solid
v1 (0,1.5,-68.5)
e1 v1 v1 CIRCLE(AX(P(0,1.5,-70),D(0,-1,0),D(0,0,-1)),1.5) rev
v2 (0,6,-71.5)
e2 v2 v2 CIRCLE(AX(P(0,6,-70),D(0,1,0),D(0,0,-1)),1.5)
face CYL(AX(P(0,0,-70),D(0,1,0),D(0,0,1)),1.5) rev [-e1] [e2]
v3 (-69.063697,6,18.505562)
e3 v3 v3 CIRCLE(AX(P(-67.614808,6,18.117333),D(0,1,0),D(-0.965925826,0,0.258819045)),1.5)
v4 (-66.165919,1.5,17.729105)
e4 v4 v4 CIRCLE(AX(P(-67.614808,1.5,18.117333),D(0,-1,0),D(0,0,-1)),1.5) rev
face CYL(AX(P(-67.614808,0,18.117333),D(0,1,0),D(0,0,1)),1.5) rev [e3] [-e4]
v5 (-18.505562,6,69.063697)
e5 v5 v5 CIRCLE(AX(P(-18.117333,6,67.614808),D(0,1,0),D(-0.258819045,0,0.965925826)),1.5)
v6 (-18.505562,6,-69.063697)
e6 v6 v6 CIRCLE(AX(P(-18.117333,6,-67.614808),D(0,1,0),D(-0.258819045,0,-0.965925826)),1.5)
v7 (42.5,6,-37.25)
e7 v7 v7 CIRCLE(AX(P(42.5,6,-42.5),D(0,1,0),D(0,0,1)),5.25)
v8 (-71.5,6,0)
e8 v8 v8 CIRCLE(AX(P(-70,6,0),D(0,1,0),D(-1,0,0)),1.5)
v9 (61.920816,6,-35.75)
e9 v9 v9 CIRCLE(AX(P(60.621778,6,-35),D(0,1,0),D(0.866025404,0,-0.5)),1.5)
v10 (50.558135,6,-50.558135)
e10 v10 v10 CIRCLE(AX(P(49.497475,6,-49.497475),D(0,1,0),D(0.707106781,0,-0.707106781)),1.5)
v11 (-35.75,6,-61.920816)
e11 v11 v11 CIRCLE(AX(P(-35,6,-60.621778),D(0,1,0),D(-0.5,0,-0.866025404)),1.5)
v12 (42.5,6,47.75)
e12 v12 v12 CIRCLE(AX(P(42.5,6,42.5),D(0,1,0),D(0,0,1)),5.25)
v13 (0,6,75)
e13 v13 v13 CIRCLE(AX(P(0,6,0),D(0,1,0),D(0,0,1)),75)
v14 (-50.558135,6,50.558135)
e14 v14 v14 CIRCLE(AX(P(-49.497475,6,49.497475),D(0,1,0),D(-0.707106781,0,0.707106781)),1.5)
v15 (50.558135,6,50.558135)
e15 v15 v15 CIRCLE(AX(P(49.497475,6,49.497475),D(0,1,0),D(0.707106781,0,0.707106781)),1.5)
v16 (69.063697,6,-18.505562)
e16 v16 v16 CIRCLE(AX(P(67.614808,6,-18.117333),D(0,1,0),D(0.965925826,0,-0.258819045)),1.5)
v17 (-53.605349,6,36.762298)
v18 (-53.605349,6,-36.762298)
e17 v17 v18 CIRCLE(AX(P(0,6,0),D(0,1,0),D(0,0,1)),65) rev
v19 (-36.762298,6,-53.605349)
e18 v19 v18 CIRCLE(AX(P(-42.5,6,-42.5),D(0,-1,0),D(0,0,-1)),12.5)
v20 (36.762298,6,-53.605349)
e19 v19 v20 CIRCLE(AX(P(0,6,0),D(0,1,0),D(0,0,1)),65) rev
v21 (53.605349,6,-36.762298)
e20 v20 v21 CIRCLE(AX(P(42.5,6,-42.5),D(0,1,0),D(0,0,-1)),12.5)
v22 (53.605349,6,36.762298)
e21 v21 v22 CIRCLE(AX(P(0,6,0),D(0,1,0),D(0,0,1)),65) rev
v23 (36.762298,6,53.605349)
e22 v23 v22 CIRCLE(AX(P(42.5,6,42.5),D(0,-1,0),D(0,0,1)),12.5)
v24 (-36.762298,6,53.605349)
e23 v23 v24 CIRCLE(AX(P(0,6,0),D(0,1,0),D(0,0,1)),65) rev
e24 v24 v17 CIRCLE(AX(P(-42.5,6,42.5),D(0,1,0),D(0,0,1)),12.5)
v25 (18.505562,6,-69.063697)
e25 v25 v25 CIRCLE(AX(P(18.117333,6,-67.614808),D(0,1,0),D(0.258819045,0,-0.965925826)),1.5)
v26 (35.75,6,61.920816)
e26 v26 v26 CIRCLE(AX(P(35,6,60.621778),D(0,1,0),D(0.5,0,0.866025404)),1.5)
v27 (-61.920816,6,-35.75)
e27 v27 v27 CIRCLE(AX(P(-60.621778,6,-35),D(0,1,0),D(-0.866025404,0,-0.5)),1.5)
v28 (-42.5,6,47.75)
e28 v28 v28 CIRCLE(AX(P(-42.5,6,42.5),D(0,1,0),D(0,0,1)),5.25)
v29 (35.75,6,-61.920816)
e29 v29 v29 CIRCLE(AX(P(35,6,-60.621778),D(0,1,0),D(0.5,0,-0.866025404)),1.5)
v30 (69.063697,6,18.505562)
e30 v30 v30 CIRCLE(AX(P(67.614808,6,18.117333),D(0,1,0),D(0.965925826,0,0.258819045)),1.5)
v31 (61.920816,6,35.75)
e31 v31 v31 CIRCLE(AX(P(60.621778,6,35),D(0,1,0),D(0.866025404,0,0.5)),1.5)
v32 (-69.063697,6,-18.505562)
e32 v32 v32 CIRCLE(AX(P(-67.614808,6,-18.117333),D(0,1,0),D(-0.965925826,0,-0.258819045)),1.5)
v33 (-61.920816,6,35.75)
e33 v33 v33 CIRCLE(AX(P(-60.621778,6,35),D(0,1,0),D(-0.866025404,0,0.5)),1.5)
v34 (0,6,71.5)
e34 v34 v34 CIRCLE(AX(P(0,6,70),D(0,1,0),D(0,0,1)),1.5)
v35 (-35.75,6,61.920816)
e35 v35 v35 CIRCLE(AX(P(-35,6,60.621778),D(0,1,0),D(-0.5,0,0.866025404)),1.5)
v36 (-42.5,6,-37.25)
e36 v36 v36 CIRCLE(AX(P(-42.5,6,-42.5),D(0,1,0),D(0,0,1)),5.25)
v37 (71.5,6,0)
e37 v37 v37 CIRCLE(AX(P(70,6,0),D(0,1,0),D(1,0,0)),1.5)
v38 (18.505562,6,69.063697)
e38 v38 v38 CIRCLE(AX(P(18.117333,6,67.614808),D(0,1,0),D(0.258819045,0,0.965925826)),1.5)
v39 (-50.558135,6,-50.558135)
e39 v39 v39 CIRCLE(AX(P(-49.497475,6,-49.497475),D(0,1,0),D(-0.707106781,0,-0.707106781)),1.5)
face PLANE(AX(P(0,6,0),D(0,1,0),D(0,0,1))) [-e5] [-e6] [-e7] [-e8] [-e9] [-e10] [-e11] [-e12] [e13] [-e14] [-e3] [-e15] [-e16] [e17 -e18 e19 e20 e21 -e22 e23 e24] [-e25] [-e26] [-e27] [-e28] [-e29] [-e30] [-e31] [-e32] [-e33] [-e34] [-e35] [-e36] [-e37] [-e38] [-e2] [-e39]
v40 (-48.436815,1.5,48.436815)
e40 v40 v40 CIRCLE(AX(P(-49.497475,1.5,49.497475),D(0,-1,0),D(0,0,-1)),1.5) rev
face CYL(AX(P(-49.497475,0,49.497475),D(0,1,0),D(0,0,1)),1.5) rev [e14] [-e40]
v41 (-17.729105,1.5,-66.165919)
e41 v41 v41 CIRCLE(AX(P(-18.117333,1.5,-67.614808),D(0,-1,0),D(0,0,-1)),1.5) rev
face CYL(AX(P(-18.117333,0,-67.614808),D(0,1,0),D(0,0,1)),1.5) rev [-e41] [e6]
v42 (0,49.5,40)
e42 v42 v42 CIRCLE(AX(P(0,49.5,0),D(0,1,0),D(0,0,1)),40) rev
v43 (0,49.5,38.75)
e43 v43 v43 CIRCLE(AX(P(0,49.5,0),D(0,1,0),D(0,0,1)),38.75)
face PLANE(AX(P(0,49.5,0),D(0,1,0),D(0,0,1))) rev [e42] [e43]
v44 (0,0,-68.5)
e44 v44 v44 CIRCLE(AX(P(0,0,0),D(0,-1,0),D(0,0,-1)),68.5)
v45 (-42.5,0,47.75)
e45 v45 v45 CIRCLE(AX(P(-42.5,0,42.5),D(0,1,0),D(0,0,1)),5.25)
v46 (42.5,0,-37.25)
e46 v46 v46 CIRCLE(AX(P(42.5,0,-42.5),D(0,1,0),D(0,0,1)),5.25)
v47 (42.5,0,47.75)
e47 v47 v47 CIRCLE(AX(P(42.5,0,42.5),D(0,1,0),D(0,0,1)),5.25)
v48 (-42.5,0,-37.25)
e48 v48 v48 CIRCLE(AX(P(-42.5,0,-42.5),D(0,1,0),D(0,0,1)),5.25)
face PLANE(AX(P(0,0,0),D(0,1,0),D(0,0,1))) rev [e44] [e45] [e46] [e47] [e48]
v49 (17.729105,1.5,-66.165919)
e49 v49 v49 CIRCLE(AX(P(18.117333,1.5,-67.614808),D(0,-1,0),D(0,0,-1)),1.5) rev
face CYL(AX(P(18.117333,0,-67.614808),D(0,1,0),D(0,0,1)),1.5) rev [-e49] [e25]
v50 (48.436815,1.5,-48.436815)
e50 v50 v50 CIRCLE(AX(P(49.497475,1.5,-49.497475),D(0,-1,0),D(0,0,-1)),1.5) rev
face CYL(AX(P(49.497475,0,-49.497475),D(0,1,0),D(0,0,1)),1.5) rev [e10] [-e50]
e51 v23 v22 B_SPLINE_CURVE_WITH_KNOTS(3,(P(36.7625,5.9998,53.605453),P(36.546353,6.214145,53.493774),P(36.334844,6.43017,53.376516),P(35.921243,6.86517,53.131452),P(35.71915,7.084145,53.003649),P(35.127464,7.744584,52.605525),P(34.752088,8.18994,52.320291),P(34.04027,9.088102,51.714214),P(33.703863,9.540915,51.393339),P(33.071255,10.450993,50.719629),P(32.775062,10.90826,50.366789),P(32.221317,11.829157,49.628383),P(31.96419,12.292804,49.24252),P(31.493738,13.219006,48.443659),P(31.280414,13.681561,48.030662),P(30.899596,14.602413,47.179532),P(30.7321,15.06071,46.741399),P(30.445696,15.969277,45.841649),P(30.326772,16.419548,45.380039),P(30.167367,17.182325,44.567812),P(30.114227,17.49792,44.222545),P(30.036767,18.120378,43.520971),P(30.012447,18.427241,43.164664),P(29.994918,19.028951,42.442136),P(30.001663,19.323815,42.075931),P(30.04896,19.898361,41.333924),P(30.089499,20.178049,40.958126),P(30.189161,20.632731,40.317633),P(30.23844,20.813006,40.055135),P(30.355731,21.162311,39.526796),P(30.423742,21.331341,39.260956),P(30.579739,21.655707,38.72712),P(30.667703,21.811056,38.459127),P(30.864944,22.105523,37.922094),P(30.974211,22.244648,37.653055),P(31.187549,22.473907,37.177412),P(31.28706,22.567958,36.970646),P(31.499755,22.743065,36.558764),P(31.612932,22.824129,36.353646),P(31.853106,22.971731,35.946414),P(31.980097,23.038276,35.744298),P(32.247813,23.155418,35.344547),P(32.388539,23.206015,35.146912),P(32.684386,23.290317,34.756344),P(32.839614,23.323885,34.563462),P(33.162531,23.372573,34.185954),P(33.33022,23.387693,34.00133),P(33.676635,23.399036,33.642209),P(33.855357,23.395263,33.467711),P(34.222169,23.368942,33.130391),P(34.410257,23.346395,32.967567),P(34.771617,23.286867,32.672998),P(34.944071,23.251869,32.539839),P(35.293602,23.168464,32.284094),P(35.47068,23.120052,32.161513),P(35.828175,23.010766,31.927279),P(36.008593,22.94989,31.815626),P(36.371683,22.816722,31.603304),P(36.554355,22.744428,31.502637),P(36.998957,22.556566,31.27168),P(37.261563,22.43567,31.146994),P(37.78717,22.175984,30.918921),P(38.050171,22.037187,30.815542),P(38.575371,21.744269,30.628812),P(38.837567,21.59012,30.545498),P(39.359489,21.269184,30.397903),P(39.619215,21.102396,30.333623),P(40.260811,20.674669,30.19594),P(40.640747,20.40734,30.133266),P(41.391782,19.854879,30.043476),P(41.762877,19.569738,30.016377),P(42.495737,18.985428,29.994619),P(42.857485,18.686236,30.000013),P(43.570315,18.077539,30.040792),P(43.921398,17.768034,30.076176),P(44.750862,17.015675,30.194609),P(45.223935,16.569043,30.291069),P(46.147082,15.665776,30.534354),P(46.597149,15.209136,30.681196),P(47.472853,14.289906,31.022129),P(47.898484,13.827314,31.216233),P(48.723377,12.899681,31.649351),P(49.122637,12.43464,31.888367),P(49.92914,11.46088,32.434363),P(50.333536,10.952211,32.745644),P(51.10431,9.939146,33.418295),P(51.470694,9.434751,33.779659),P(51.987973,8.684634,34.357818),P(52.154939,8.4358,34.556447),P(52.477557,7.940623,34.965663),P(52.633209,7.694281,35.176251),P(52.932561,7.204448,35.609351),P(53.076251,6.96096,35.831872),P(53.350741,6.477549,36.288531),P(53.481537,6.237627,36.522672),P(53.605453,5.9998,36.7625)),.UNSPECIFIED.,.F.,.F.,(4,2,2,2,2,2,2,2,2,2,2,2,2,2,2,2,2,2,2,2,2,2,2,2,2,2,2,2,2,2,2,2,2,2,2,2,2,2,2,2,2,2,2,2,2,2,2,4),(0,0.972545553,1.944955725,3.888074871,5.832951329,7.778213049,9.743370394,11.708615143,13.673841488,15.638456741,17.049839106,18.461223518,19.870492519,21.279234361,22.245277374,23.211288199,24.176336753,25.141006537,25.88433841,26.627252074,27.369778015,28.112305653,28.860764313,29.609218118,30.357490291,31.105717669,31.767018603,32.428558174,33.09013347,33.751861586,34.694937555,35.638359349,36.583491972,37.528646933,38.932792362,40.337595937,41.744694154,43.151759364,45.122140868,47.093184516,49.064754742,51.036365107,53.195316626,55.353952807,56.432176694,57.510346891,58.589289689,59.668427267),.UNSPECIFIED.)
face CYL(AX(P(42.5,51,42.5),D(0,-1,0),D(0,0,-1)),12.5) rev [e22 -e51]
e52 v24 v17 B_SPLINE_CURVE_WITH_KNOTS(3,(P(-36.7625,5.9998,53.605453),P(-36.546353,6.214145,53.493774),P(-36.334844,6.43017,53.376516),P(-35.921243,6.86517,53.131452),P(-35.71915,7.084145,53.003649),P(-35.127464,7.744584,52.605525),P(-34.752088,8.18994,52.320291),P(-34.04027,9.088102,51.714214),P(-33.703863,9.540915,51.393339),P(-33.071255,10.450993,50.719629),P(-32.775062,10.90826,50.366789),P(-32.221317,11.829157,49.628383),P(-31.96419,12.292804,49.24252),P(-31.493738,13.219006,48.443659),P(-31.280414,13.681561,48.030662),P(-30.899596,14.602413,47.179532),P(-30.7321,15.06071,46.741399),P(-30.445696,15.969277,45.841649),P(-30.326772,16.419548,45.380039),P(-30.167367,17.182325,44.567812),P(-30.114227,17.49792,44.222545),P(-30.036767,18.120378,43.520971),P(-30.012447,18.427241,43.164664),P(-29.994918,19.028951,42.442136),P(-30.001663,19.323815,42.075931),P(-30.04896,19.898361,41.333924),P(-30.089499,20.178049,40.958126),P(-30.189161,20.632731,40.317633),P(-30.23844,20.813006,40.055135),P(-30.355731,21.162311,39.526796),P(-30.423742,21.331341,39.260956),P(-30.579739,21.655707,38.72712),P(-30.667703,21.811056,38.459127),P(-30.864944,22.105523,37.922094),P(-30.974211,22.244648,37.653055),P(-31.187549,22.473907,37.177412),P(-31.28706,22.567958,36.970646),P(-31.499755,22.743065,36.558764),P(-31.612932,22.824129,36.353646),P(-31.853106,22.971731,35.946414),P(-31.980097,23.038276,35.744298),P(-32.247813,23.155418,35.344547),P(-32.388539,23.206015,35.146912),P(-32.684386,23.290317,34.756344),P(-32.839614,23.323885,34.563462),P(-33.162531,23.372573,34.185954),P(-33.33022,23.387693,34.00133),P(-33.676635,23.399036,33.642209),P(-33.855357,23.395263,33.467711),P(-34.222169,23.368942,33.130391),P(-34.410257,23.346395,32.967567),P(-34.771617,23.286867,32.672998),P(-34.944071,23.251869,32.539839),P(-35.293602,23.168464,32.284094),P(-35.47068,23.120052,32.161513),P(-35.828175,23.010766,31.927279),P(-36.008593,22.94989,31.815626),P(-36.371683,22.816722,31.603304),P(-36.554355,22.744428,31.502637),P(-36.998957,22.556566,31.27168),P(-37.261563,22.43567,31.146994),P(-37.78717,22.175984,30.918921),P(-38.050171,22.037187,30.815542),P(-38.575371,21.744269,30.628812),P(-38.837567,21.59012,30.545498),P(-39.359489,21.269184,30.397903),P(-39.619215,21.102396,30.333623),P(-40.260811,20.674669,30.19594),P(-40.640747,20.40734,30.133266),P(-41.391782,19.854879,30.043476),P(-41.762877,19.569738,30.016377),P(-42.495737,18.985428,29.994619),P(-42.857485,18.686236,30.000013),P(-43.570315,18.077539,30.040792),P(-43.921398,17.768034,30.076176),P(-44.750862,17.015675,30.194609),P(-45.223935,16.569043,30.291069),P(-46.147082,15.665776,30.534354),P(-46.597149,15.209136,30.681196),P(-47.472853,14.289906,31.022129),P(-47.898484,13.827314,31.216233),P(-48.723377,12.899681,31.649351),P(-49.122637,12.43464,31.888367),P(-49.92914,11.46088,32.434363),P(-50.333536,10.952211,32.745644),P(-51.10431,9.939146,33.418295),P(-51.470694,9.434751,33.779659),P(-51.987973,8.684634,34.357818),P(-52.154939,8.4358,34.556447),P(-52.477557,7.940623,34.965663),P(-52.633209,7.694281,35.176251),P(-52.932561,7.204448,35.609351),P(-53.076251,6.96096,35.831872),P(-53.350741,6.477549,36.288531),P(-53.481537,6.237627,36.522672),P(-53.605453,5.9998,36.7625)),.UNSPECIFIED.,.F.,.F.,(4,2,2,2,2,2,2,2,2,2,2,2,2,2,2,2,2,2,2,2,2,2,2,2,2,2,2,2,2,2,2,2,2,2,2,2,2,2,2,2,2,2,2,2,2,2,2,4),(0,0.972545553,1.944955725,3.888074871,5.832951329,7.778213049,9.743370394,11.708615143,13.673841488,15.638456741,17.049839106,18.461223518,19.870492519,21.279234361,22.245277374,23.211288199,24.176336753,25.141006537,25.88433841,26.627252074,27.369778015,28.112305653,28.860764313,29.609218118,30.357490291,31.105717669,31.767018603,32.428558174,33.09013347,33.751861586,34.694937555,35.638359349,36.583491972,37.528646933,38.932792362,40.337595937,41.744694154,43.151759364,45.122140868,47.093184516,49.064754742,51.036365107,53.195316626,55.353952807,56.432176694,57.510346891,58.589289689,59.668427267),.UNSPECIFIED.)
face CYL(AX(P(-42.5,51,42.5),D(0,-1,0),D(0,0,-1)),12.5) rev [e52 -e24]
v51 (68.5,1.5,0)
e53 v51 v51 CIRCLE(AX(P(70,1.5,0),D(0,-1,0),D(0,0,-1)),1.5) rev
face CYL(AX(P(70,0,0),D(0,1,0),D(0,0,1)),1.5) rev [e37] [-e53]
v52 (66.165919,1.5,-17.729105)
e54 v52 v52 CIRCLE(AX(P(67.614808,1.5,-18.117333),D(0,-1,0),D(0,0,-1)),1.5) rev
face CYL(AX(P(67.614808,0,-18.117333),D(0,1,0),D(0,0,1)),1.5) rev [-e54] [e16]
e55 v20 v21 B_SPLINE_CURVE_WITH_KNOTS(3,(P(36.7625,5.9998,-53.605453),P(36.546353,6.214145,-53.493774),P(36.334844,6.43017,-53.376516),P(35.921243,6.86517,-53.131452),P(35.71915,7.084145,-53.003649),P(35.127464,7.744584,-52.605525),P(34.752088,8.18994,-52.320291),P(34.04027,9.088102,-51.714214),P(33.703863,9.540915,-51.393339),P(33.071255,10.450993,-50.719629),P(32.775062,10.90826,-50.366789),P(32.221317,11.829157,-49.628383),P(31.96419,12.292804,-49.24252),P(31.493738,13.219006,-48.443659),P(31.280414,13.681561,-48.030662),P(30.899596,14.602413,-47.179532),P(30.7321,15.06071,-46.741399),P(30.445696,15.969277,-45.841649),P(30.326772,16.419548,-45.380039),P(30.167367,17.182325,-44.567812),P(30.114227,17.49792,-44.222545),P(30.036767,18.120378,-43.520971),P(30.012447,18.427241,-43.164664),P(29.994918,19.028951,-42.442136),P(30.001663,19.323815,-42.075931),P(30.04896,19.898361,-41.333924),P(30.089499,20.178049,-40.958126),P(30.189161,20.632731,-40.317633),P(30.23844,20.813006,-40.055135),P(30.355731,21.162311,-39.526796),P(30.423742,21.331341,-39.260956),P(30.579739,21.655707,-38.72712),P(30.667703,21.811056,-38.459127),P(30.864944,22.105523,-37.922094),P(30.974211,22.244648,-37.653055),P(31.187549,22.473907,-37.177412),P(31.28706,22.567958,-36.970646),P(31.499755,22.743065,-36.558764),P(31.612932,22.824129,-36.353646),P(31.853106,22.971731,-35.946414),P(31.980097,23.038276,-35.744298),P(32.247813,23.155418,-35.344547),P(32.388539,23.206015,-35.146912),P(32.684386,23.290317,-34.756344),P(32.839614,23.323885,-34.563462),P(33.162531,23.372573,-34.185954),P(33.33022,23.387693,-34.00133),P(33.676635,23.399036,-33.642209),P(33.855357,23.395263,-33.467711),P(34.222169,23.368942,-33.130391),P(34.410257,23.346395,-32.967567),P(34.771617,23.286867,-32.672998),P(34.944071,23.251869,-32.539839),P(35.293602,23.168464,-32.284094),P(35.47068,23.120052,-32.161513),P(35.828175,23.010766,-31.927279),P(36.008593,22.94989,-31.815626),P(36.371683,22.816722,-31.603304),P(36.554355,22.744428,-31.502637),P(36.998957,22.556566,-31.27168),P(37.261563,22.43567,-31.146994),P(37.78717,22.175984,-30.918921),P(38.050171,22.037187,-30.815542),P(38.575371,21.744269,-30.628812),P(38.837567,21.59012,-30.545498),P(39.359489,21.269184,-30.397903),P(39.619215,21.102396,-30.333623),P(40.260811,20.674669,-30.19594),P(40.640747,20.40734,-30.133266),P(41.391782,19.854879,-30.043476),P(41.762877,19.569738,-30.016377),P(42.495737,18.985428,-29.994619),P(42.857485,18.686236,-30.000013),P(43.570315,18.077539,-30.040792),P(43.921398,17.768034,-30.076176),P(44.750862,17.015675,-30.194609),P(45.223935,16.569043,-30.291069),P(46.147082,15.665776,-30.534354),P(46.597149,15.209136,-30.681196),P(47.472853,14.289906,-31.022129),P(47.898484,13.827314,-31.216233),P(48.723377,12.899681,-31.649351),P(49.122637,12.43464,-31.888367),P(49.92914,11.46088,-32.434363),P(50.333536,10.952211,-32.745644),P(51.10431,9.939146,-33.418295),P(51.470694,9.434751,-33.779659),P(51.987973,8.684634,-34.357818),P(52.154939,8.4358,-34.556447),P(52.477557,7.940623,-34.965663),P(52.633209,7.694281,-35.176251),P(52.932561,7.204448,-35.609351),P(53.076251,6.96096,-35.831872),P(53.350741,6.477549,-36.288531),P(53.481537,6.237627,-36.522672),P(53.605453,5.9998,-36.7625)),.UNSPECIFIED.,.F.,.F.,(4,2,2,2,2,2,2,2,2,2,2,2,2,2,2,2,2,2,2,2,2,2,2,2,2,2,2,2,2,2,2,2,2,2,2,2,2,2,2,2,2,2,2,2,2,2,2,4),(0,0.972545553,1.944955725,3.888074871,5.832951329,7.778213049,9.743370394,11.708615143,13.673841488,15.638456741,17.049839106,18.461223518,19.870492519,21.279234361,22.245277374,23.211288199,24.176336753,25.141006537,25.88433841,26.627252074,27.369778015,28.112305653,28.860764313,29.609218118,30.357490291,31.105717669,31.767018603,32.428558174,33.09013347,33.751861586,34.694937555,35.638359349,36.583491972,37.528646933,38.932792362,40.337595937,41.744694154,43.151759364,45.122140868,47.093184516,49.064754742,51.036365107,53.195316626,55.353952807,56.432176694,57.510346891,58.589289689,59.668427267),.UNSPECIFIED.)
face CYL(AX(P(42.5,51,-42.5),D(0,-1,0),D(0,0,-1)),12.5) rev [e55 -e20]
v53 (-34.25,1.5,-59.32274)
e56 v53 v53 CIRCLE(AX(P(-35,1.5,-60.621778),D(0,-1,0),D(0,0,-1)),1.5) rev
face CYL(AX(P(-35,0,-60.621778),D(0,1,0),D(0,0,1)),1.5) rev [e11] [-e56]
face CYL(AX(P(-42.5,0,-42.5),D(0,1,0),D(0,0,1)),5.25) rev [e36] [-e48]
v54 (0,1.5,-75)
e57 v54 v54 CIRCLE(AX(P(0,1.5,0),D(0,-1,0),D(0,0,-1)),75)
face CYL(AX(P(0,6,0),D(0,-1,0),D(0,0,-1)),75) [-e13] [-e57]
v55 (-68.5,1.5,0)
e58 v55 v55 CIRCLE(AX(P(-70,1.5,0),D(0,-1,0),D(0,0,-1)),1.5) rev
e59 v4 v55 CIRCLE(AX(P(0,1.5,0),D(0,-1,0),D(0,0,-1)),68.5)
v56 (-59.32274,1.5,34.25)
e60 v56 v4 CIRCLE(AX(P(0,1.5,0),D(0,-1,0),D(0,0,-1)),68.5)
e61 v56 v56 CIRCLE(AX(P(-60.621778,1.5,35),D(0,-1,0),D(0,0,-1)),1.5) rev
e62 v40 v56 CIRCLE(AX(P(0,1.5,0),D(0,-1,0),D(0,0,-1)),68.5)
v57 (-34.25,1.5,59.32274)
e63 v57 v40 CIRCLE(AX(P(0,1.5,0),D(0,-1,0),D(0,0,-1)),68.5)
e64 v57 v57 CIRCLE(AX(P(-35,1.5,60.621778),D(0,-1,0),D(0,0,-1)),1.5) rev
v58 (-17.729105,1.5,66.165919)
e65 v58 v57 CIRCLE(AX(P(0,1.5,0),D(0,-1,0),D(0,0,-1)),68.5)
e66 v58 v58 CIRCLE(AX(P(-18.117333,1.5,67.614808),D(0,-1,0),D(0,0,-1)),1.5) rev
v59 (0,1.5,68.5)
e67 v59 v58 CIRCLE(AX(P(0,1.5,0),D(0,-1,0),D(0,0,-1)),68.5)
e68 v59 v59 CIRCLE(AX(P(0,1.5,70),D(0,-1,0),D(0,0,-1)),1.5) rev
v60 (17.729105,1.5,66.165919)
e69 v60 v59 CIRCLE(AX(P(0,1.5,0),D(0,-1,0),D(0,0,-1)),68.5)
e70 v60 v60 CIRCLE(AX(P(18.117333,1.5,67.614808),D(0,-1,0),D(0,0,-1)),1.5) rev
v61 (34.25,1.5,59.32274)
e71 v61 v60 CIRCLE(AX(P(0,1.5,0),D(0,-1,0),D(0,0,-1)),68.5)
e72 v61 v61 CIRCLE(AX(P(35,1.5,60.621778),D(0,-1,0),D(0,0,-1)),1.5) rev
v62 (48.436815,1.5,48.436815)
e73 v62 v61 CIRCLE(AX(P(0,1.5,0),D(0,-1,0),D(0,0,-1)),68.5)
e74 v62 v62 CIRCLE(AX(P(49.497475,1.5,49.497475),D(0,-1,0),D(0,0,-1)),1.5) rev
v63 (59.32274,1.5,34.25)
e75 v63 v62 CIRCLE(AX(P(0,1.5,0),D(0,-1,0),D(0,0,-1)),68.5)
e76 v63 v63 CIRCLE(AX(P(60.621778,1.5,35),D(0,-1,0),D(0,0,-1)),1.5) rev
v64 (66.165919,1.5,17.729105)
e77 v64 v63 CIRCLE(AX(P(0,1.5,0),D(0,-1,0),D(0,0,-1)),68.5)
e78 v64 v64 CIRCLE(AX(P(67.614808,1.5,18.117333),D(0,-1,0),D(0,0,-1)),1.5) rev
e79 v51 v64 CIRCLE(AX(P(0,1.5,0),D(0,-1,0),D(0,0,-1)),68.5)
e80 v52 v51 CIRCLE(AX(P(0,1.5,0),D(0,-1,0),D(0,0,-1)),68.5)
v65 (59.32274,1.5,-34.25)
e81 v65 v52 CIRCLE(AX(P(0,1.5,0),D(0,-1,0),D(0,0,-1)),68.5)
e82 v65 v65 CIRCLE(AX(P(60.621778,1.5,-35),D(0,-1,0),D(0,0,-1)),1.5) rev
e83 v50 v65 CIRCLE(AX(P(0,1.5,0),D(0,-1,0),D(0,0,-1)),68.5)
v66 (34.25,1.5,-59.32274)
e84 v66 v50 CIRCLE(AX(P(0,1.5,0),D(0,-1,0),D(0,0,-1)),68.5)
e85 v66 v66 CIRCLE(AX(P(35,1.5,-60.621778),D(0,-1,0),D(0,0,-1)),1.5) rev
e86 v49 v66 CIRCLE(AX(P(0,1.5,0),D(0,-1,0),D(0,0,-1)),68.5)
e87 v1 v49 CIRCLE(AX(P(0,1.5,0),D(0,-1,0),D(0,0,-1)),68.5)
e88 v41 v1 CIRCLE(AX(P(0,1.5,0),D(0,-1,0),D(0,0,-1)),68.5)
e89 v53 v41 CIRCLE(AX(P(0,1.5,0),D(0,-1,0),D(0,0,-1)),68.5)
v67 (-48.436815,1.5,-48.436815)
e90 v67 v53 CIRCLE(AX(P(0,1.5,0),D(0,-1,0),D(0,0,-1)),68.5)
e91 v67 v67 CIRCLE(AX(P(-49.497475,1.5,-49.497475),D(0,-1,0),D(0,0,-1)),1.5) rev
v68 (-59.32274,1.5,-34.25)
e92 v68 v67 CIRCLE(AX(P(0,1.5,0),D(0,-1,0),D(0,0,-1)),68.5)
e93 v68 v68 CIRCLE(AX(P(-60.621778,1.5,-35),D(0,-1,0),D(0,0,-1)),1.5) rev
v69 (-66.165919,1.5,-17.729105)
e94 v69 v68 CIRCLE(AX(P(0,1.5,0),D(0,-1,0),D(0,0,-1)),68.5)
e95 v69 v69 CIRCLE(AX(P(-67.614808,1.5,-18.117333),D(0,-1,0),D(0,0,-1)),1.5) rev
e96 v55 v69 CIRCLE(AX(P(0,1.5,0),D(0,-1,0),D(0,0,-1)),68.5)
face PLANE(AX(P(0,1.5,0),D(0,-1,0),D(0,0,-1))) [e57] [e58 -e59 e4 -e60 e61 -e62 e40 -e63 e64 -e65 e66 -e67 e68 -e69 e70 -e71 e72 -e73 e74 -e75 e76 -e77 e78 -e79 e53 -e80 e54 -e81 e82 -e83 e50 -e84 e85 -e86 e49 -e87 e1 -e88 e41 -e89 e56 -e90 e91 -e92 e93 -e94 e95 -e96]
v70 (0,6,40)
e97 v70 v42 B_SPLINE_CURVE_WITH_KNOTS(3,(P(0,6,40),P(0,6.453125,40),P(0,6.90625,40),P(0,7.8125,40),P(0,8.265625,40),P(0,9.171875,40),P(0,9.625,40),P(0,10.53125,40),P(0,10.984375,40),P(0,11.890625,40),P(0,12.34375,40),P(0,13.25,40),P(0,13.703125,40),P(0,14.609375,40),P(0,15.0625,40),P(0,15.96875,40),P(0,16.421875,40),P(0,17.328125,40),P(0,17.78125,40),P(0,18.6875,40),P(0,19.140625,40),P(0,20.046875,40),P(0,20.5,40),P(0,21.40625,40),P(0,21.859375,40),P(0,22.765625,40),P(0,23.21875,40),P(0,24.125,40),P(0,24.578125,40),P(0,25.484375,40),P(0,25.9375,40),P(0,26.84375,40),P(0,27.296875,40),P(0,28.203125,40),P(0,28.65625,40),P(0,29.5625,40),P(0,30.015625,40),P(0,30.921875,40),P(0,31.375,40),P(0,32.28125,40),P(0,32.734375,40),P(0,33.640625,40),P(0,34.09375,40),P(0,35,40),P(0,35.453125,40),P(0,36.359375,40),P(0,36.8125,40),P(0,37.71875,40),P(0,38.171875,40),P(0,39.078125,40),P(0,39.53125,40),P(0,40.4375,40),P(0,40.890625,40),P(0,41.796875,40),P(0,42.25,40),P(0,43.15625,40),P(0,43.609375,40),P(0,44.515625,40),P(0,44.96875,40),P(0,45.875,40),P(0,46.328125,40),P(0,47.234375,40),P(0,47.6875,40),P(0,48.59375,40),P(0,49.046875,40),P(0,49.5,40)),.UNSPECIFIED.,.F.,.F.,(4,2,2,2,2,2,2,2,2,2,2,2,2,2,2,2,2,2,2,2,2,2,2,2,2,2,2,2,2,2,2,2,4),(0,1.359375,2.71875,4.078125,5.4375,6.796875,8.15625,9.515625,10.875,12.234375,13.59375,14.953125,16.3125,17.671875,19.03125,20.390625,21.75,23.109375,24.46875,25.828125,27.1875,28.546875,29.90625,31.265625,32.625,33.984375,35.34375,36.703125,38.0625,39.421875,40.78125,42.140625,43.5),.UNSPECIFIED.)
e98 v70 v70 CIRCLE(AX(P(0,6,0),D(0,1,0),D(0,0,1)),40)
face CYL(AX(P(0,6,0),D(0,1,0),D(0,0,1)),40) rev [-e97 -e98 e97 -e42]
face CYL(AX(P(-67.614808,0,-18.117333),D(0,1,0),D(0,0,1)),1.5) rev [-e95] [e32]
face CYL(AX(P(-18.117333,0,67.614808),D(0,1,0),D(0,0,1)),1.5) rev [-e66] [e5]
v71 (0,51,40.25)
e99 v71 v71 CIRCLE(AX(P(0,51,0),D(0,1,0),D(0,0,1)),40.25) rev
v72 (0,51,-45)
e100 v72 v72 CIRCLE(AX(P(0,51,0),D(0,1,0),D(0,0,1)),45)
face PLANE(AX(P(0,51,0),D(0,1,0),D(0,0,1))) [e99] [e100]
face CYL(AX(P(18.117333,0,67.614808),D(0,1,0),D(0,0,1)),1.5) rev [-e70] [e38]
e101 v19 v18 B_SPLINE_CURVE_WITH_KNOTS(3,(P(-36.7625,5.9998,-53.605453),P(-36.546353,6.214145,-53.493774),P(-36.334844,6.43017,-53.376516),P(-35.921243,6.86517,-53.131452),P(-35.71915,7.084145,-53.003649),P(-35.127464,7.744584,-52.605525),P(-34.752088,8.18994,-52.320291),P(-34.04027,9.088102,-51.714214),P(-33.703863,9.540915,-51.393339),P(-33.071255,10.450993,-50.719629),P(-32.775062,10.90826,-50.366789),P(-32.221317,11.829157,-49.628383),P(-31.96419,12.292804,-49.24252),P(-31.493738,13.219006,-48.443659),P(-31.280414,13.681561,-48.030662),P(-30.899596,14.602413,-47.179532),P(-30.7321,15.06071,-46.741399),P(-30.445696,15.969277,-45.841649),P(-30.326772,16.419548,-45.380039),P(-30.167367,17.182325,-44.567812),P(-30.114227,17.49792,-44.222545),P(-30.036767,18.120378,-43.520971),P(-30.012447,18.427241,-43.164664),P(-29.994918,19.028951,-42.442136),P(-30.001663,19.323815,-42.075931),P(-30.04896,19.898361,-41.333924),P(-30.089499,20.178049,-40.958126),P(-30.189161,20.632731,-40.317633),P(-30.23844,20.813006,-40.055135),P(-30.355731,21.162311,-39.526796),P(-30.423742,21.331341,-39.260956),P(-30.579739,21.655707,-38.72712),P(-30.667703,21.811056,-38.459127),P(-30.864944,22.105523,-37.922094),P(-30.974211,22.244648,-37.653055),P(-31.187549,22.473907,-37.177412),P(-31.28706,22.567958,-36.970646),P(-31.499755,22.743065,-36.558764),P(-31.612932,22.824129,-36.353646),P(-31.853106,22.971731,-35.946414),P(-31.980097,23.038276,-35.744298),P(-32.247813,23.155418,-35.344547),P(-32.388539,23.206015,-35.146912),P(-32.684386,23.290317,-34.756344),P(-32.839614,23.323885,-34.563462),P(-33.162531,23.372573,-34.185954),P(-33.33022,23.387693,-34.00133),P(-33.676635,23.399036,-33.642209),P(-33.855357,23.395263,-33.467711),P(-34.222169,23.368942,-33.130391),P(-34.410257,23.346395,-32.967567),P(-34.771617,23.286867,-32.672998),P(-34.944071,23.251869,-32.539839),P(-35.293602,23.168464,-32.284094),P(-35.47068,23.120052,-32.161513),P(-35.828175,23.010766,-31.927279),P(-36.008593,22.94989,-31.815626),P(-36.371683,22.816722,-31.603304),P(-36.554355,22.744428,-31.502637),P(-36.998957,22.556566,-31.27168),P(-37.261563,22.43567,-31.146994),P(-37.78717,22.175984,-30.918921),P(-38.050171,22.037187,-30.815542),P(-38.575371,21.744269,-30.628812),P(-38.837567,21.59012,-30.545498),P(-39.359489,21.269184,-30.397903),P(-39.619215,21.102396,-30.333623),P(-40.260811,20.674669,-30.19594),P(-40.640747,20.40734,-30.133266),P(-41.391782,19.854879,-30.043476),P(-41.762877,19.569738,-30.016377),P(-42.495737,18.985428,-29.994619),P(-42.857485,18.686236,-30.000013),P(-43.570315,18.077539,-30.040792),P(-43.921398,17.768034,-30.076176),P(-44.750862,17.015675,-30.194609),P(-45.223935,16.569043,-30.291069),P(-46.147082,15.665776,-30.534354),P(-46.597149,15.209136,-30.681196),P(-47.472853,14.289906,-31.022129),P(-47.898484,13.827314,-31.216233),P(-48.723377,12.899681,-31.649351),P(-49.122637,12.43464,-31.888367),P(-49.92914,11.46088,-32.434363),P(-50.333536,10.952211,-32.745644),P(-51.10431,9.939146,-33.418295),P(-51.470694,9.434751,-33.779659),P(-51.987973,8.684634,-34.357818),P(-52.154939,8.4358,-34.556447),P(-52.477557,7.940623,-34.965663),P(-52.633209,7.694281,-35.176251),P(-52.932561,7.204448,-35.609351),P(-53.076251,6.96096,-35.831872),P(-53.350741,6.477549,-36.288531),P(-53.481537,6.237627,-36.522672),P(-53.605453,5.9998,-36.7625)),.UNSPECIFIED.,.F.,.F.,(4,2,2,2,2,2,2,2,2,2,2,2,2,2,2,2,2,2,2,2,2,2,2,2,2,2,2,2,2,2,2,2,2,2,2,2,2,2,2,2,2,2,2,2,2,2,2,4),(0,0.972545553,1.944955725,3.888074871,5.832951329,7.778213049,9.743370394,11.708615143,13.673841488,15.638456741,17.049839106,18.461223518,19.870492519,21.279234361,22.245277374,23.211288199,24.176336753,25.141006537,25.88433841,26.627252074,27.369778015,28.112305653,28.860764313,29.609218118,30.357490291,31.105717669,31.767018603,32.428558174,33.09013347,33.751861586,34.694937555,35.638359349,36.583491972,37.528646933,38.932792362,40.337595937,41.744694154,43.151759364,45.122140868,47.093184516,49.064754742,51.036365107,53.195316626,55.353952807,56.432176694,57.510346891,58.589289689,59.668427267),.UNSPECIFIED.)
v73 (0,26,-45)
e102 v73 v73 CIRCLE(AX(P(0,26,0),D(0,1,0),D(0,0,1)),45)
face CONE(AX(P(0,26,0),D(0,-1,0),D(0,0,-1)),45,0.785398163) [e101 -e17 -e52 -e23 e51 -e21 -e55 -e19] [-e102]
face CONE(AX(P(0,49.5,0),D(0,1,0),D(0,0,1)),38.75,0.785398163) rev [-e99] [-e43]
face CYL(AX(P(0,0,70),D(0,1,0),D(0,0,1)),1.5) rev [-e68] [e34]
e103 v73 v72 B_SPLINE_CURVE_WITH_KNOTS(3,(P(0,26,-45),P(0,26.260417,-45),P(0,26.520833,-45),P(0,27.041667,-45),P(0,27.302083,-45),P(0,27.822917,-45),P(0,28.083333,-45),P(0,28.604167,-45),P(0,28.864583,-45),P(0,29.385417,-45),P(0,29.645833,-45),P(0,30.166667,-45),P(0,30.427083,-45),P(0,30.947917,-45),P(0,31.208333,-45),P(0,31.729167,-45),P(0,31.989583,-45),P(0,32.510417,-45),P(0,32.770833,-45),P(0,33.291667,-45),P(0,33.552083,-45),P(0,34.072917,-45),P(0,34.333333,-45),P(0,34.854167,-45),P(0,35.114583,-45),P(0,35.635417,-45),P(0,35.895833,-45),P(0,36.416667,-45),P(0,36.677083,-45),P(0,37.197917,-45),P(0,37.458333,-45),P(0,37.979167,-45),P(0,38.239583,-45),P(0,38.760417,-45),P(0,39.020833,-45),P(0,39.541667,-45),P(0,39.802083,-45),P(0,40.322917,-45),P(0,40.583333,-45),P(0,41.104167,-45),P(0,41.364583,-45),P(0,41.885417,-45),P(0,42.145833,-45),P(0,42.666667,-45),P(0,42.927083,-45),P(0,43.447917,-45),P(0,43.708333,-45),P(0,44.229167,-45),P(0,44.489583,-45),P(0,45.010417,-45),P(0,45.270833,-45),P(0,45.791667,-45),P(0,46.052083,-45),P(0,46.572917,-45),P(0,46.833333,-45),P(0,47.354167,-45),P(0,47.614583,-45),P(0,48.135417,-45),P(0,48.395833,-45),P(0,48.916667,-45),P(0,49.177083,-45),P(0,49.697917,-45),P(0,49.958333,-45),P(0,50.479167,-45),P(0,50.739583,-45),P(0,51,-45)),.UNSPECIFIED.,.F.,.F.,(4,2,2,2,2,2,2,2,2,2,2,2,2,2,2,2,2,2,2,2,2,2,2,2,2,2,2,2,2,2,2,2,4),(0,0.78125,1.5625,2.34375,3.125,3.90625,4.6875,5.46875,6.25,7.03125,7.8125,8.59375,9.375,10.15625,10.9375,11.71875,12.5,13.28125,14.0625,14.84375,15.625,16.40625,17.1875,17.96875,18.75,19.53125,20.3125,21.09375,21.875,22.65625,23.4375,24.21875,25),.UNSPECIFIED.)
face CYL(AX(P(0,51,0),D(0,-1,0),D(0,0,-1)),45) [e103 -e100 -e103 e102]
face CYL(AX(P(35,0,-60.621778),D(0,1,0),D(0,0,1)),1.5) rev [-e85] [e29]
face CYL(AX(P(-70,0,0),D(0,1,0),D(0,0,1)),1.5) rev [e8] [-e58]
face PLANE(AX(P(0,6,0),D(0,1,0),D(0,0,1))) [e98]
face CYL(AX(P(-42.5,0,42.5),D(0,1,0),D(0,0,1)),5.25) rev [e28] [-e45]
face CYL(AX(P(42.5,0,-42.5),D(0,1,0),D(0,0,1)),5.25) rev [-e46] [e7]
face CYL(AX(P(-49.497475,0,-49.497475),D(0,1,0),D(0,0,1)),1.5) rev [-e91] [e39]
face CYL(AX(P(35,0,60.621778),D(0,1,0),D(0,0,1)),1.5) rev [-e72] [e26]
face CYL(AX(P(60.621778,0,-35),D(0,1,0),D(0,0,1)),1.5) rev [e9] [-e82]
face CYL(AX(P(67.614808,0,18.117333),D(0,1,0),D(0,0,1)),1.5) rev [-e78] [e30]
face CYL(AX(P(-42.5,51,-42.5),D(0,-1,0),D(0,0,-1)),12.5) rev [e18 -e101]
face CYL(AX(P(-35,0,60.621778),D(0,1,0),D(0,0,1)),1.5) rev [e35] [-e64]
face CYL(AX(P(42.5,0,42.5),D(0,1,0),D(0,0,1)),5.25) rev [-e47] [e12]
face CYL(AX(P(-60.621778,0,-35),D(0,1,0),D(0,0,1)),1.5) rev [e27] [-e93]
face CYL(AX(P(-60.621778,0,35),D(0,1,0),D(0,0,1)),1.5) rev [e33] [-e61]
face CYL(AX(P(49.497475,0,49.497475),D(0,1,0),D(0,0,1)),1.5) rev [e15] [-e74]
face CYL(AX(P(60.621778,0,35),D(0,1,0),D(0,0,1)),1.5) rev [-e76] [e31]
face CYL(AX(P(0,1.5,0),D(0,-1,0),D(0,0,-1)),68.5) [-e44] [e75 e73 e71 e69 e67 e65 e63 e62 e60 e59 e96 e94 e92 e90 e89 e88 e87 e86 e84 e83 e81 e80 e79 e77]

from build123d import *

# Parameters (mm, degrees)
SKETCH2_R                                  = 75
BOSS_EXTRUDE1_DEPTH                        = 6
SKETCH3_R                                  = 45
BOSS_EXTRUDE2_DEPTH                        = 45
SKETCH4_R                                  = 40
CUT_EXTRUDE1_DEPTH                         = 45
SKETCH7_R                                  = 1.5
CUT_EXTRUDE4_DEPTH                         = 116.217186218
CIRPATTERN2_COUNT                          = 24
SKETCH8_R                                  = 5.25
CUT_EXTRUDE5_DEPTH                         = 116.217186218
LPATTERN2_COUNT                            = 2
LPATTERN2_PITCH                            = 85
LPATTERN2_COUNT_DIR2                       = 2
LPATTERN2_PITCH_DIR2                       = 85
SKETCH9_R                                  = 12.5
CUT_EXTRUDE6_DEPTH                         = 116.217186218
MIRROR1_AT_THE_SECOND_PLANE_COPY_1_SKETC_R = 12.5
MIRROR1_AT_THE_SECOND_PLANE_COPY_1_DEPTH   = 116.217186218
SKETCH14_R                                 = 75
SKETCH14_R_2                               = 68.5
CUT_EXTRUDE8_DEPTH                         = 1.5
SKETCH15_R                                 = 40
SKETCH15_R_2                               = 38.75
BOSS_EXTRUDE4_DEPTH                        = 1.5
CHAMFER3_SIZE                              = 1.5


# Some blends are built 0.0001 mm under size
with BuildPart() as part:
    # Sketch2 → Boss-Extrude1 (new body)
    with BuildSketch(Plane(origin=(0, 0, 0), x_dir=(1, 0, 0), z_dir=(0, 1, 0))):
        with Locations(Location((0, 0, 0), (0, 0, 270))):
            Circle(SKETCH2_R)
    extrude(amount=BOSS_EXTRUDE1_DEPTH)

    # Sketch3 → Boss-Extrude2 (add)
    with BuildSketch(Plane(origin=(0, 6, 0), x_dir=(1, 0, 0), z_dir=(0, 1, 0))):
        with Locations(Location((0, 0, 0), (0, 0, 90))):
            Circle(SKETCH3_R)
    extrude(amount=BOSS_EXTRUDE2_DEPTH)

    # Sketch4 → Cut-Extrude1 (cut)
    with BuildSketch(Plane(origin=(0, 51, 0), x_dir=(1, 0, 0), z_dir=(0, 1, 0))):
        with Locations(Location((0, 0, 0), (0, 0, 270))):
            Circle(SKETCH4_R)
    extrude(amount=-CUT_EXTRUDE1_DEPTH, mode=Mode.SUBTRACT)

    # Sketch7 → Cut-Extrude4 (cut, through all)
    with BuildSketch(Plane(origin=(0, 6, 0), x_dir=(1, 0, 0), z_dir=(0, 1, 0))):
        with Locations(Location((0, -70, 0), (0, 0, 270))):
            Circle(SKETCH7_R)
    cut_extrude4 = extrude(amount=-CUT_EXTRUDE4_DEPTH, mode=Mode.SUBTRACT)

    # CirPattern2: Cut-Extrude4 ×24 about axis
    cirpattern2_axis = Axis((0, 0, 0), (0, 1, 0))
    for i in range(1, CIRPATTERN2_COUNT):
        add(cut_extrude4.rotate(cirpattern2_axis, i * 360 / CIRPATTERN2_COUNT), mode=Mode.SUBTRACT)

    # Sketch8 → Cut-Extrude5 (cut, through all)
    with BuildSketch(Plane(origin=(0, 6, 0), x_dir=(1, 0, 0), z_dir=(0, 1, 0))):
        with Locations(Location((-42.5, 42.5, 0), (0, 0, 270))):
            Circle(SKETCH8_R)
    cut_extrude5 = extrude(amount=-CUT_EXTRUDE5_DEPTH, mode=Mode.SUBTRACT)

    # LPattern2: Cut-Extrude5 2 × 2
    with Locations(*[(i * LPATTERN2_PITCH, 0, j * LPATTERN2_PITCH_DIR2) for i in range(LPATTERN2_COUNT) for j in range(LPATTERN2_COUNT_DIR2) if (i, j) != (0, 0)]):
        add(cut_extrude5, mode=Mode.SUBTRACT)

    # Chamfer2
    # the kernel refuses this chamfer: 20 mm, written as the material it adds along each edge
    with BuildSketch(Plane(origin=(0, 6, 0), x_dir=(0, 0, -1), z_dir=(1, 0, 0))) as chamfer2_piece_1_section:
        with BuildLine():
            Line((65.565685425, -0.565685425), (44.434314575, 20.565685425))
            Line((44.434314575, 20.565685425), (44.034314575, 20.565685425))
            ThreePointArc((44.034314575, 20.565685425), (44.6, 10.282842712), (44.6, 0))
            Line((44.6, 0), (45, -0.4))
            ThreePointArc((45, -0.4), (55.282842712, -0.4), (65.565685425, -0.965685425))
            Line((65.565685425, -0.965685425), (65.565685425, -0.565685425))
        make_face()
    chamfer2_piece_1 = revolve(axis=Axis((0, 6, 0), (0, 1, 0)), mode=Mode.PRIVATE)
    chamfer2_piece_1 = chamfer2_piece_1 - Plane(origin=(-42.5, 15.709329552, 42.5), x_dir=(0, 0, 1), z_dir=(0, 1, 0)) * Cylinder(5.25, 263, mode=Mode.PRIVATE)
    chamfer2_piece_1 = chamfer2_piece_1 - Plane(origin=(42.5, 15.709329552, 42.5), x_dir=(0, 0, 1), z_dir=(0, 1, 0)) * Cylinder(5.25, 263, mode=Mode.PRIVATE)
    chamfer2_piece_1 = chamfer2_piece_1 - Plane(origin=(-42.5, 15.709329552, -42.5), x_dir=(0, 0, 1), z_dir=(0, 1, 0)) * Cylinder(5.25, 263, mode=Mode.PRIVATE)
    chamfer2_piece_1 = chamfer2_piece_1 - Plane(origin=(42.5, 15.709329552, -42.5), x_dir=(0, 0, 1), z_dir=(0, 1, 0)) * Cylinder(5.25, 263, mode=Mode.PRIVATE)
    add(chamfer2_piece_1)

    # Sketch9 → Cut-Extrude6 (cut, through all)
    with BuildSketch(Plane(origin=(0, 6, 0), x_dir=(1, 0, 0), z_dir=(0, 1, 0))):
        with Locations((-42.5, -42.5)):
            Circle(SKETCH9_R)
    cut_extrude6 = extrude(amount=CUT_EXTRUDE6_DEPTH, mode=Mode.SUBTRACT)

    # Mirror1: Cut-Extrude6 across plane
    add(cut_extrude6.mirror(Plane(origin=(0, 0, 0), x_dir=(0, 0, 1), z_dir=(1, 0, 0))), mode=Mode.SUBTRACT)

    # Mirror1 at the second plane: Cut-Extrude6 across plane
    add(cut_extrude6.mirror(Plane.XY), mode=Mode.SUBTRACT)

    # Mirror1 at the second plane copy 1 sketc → Mirror1 at the second plane copy 1 (cut, through all)
    with BuildSketch(Plane(origin=(0, 6, 0), x_dir=(-1, 0, 0), z_dir=(0, 1, 0))):
        with Locations((-42.5, -42.5)):
            Circle(MIRROR1_AT_THE_SECOND_PLANE_COPY_1_SKETC_R)
    extrude(amount=MIRROR1_AT_THE_SECOND_PLANE_COPY_1_DEPTH, mode=Mode.SUBTRACT)

    # Sketch14 → Cut-Extrude8 (cut)
    with BuildSketch(Plane(origin=(0, 0, 0), x_dir=(-1, 0, 0), z_dir=(0, -1, 0))):
        with Locations(Location((0, 0, 0), (0, 0, 90))):
            Circle(SKETCH14_R)
        with Locations(Location((0, 0, 0), (0, 0, 90))):
            Circle(SKETCH14_R_2, mode=Mode.SUBTRACT)
    extrude(amount=-CUT_EXTRUDE8_DEPTH, mode=Mode.SUBTRACT)

    # Sketch15 → Boss-Extrude4 (add)
    with BuildSketch(Plane(origin=(0, 51, 0), x_dir=(1, 0, 0), z_dir=(0, 1, 0))):
        with Locations(Location((0, 0, 0), (0, 0, 270))):
            Circle(SKETCH15_R)
        with Locations(Location((0, 0, 0), (0, 0, 270))):
            Circle(SKETCH15_R_2, mode=Mode.SUBTRACT)
    extrude(amount=-BOSS_EXTRUDE4_DEPTH)

    # Chamfer3
    chamfer3_edges = [part.edges().sort_by_distance(p)[0] for p in [
        (0, 51, -38.75),
    ]]
    chamfer(chamfer3_edges, length=CHAMFER3_SIZE - 0.0001)  # a hair under: the kernel refuses the full size


solid = part.part
